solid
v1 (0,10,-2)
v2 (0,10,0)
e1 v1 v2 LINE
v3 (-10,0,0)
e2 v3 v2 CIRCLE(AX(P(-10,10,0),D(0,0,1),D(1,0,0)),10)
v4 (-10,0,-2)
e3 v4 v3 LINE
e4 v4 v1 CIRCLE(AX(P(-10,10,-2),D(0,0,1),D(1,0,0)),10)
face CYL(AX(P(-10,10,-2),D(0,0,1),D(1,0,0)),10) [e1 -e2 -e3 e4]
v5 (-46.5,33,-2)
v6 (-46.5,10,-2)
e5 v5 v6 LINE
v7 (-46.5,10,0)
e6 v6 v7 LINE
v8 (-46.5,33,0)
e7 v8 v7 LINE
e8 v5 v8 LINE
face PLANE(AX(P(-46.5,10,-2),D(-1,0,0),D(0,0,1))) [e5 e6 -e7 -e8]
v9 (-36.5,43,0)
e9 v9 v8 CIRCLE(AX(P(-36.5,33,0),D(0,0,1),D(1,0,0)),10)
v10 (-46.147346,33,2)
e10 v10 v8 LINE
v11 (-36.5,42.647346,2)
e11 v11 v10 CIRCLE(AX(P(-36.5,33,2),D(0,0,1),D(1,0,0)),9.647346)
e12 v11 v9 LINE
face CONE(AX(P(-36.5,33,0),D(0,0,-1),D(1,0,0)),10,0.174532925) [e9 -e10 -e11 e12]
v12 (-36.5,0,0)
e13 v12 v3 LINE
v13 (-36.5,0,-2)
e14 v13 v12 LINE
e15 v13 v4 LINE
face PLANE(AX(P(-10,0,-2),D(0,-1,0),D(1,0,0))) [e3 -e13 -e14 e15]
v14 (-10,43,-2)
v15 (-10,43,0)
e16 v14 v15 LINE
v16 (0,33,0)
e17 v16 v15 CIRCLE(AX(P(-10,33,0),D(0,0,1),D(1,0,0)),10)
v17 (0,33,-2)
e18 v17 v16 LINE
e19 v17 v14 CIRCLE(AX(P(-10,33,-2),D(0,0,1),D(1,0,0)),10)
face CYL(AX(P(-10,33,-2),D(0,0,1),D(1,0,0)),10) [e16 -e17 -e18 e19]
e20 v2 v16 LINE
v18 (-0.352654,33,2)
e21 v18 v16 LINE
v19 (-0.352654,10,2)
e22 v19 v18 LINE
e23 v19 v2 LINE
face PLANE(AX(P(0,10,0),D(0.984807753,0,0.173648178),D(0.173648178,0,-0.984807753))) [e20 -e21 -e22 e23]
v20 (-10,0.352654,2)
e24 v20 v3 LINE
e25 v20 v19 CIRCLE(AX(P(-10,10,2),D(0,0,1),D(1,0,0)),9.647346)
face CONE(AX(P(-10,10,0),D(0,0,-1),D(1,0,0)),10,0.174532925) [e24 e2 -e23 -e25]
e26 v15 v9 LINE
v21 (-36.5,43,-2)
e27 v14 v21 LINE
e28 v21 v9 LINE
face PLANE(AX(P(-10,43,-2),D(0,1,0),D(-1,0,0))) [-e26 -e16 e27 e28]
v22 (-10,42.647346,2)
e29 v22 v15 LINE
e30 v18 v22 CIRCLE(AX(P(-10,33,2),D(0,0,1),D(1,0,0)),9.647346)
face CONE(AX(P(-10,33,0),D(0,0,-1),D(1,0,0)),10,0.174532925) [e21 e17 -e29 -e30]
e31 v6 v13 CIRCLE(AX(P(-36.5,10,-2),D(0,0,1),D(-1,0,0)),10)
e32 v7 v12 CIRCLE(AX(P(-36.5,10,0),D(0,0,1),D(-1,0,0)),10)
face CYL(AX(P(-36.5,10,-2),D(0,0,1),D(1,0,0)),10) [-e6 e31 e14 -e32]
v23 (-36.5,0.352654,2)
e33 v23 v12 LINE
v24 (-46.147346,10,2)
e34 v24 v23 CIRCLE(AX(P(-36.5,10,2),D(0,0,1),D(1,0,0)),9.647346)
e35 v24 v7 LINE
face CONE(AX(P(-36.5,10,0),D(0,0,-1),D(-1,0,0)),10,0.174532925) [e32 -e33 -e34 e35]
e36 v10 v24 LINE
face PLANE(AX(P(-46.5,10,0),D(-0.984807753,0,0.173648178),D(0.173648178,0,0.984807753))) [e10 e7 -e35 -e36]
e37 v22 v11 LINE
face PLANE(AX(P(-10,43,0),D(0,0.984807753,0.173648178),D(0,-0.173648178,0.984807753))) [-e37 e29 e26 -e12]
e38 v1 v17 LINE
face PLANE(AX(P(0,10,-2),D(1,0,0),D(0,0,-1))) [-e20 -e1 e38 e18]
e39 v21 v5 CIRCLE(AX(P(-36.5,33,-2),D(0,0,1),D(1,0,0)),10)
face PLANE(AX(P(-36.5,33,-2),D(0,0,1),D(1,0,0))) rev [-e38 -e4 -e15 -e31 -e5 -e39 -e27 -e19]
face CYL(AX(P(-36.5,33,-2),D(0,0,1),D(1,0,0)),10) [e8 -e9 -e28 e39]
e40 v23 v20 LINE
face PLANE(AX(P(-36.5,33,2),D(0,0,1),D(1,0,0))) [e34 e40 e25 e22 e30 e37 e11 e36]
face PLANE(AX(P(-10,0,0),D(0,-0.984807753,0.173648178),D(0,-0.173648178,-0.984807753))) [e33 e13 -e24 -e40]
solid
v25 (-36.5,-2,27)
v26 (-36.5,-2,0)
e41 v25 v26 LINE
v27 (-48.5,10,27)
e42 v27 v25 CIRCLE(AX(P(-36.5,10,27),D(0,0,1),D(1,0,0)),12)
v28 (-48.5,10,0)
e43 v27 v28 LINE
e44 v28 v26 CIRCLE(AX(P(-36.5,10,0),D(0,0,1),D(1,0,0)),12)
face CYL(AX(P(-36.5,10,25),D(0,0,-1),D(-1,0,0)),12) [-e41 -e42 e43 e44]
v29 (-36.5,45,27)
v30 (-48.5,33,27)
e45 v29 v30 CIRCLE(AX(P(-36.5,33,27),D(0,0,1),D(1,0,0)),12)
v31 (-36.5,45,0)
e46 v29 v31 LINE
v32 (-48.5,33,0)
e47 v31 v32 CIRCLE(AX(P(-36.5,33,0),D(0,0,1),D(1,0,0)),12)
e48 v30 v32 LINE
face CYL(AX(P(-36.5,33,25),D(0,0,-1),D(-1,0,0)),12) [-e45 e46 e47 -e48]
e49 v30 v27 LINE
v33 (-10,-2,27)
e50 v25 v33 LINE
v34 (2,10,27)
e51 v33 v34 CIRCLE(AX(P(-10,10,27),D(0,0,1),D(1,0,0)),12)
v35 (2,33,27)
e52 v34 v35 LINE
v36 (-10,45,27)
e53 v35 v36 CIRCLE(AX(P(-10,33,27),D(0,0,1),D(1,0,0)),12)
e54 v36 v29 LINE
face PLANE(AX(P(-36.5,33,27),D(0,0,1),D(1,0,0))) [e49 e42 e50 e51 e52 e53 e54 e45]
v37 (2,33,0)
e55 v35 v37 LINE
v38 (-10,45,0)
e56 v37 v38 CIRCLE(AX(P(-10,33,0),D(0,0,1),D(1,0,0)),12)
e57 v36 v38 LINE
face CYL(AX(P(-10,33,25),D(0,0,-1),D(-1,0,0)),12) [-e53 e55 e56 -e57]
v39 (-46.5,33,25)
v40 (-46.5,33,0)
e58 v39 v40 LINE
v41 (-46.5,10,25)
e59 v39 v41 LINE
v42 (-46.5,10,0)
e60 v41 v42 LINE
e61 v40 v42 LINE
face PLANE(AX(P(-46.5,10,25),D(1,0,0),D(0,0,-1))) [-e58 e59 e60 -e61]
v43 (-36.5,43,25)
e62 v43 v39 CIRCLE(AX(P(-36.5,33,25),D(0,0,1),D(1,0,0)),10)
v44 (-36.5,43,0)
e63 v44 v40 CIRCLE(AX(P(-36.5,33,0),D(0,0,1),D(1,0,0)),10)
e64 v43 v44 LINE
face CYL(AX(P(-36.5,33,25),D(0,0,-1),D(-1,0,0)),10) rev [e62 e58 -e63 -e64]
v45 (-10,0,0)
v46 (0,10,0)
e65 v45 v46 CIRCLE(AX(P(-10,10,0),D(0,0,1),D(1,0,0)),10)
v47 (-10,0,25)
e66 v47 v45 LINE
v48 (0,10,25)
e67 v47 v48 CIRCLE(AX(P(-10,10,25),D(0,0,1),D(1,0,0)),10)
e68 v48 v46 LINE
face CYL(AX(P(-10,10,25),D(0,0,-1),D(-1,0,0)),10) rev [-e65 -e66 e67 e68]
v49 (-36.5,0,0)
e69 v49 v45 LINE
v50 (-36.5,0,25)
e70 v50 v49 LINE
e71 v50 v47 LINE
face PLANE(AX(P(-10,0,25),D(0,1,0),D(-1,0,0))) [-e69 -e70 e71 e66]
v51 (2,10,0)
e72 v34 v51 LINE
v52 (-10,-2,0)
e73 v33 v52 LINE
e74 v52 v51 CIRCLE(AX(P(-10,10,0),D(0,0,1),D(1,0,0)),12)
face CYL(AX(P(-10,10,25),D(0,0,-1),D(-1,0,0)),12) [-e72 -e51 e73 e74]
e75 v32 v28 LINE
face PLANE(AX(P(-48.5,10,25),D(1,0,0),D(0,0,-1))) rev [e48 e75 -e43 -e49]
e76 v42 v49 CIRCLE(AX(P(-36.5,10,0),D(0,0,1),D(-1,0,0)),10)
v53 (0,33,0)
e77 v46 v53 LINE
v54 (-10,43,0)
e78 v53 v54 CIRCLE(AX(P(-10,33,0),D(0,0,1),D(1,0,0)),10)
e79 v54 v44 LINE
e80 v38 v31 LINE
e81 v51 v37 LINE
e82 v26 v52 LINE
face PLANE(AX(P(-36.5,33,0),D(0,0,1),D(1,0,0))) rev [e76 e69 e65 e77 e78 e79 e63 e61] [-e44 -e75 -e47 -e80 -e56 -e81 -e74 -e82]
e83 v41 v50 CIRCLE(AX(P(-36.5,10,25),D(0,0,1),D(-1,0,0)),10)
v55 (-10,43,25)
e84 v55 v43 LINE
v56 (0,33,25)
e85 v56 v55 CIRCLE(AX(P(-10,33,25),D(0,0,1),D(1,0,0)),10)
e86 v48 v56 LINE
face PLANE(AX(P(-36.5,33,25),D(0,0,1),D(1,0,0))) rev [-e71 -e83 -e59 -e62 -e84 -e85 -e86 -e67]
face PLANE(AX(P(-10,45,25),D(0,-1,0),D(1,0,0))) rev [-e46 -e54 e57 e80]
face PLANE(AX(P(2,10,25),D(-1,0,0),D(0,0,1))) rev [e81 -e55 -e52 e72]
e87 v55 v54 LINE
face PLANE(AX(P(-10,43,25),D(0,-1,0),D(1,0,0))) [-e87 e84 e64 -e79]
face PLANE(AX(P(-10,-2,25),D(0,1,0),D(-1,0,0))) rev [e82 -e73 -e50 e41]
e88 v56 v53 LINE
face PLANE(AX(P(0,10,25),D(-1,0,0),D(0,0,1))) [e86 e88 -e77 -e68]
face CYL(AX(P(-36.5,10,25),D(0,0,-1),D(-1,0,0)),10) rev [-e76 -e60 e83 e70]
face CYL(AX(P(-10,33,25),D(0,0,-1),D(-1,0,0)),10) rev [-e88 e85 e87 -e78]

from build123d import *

# Parameters (mm, degrees)
RESSALTO_EXTRUS_O1_DEPTH           = 25
CASCA1_START                       = -36.5
CASCA1_OUTLINE_W                   = 43
CASCA1_OUTLINE_H                   = 25
CASCA1_DEPTH                       = 26.5
CASCA1_2_DEPTH                     = 26.5
CASCA1_3_DEPTH                     = 25
CASCA1_4_DEPTH                     = 27
CASCA1_START_2                     = 25
CASCA1_5_DEPTH                     = 2
RESSALTO_EXTRUS_O2_DEPTH           = 2
RESSALTO_EXTRUS_O2_OTHER_WAY_DEPTH = 2
RESSALTO_EXTRUS_O2_OTHER_WAY_TAPER = 10


with BuildPart() as part:
    # Esboço1 → Ressalto-extrusão1 (new body)
    with BuildSketch(Plane.XY):
        with BuildLine():
            Line((-10, 0), (-36.5, 0))
            ThreePointArc((-36.5, 0), (-43.571067812, 2.928932188), (-46.5, 10))
            Line((-46.5, 10), (-46.5, 33))
            ThreePointArc((-46.5, 33), (-43.571067812, 40.071067812), (-36.5, 43))
            Line((-36.5, 43), (-10, 43))
            ThreePointArc((-10, 43), (-2.928932188, 40.071067812), (0, 33))
            Line((0, 33), (0, 10))
            ThreePointArc((0, 10), (-2.928932188, 2.928932188), (-10, 0))
        make_face()
    extrude(amount=RESSALTO_EXTRUS_O1_DEPTH)

    # Casca1: read off the stored shape, not the designer's step
    # Casca1 outline → Casca1 (cut)
    with BuildSketch(Plane.YZ.offset(CASCA1_START)):
        with Locations((21.5, 12.5)):
            Rectangle(CASCA1_OUTLINE_W, CASCA1_OUTLINE_H)
    extrude(amount=CASCA1_DEPTH, mode=Mode.SUBTRACT)

    # Casca1 2 outline → Casca1 2 (add)
    with BuildSketch(Plane.YZ.offset(CASCA1_START)):
        Polygon((-2, 27), (-2, 0), (0, 0), (0, 25), (43, 25), (43, 0), (45, 0), (45, 27), align=None)
    extrude(amount=CASCA1_2_DEPTH)

    # Casca1 3 outline → Casca1 3 (cut)
    with BuildSketch(Plane.XY):
        with BuildLine():
            Line((-36.5, 0), (-36.5, 43))
            ThreePointArc((-36.5, 43), (-43.571067812, 40.071067812), (-46.5, 33))
            Line((-46.5, 33), (-46.5, 10))
            ThreePointArc((-46.5, 10), (-43.571067812, 2.928932188), (-36.5, 0))
        make_face()
        with BuildLine():
            Line((-10, 43), (-10, 0))
            ThreePointArc((-10, 0), (-2.928932188, 2.928932188), (0, 10))
            Line((0, 10), (0, 33))
            ThreePointArc((0, 33), (-2.928932188, 40.071067812), (-10, 43))
        make_face()
    extrude(amount=CASCA1_3_DEPTH, mode=Mode.SUBTRACT)

    # Casca1 4 outline → Casca1 4 (add)
    with BuildSketch(Plane.XY):
        with BuildLine():
            ThreePointArc((-36.5, 45), (-44.985281374, 41.485281374), (-48.5, 33))
            Line((-48.5, 33), (-48.5, 10))
            ThreePointArc((-48.5, 10), (-44.985281374, 1.514718626), (-36.5, -2))
            Line((-36.5, -2), (-36.5, 0))
            ThreePointArc((-36.5, 0), (-43.571067812, 2.928932188), (-46.5, 10))
            Line((-46.5, 10), (-46.5, 33))
            ThreePointArc((-46.5, 33), (-43.571067812, 40.071067812), (-36.5, 43))
            Line((-36.5, 43), (-36.5, 45))
        make_face()
        with BuildLine():
            ThreePointArc((-10, -2), (-1.514718626, 1.514718626), (2, 10))
            Line((2, 10), (2, 33))
            ThreePointArc((2, 33), (-1.514718626, 41.485281374), (-10, 45))
            Line((-10, 45), (-10, 43))
            ThreePointArc((-10, 43), (-2.928932188, 40.071067812), (0, 33))
            Line((0, 33), (0, 10))
            ThreePointArc((0, 10), (-2.928932188, 2.928932188), (-10, 0))
            Line((-10, 0), (-10, -2))
        make_face()
    extrude(amount=CASCA1_4_DEPTH)

    # Casca1 5 outline → Casca1 5 (add)
    with BuildSketch(Plane.XY.offset(CASCA1_START_2)):
        with BuildLine():
            Line((-36.5, 0), (-36.5, 43))
            ThreePointArc((-36.5, 43), (-43.571067812, 40.071067812), (-46.5, 33))
            Line((-46.5, 33), (-46.5, 10))
            ThreePointArc((-46.5, 10), (-43.571067812, 2.928932188), (-36.5, 0))
        make_face()
        with BuildLine():
            Line((-10, 43), (-10, 0))
            ThreePointArc((-10, 0), (-2.928932188, 2.928932188), (0, 10))
            Line((0, 10), (0, 33))
            ThreePointArc((0, 33), (-2.928932188, 40.071067812), (-10, 43))
        make_face()
    extrude(amount=CASCA1_5_DEPTH)



with BuildPart() as body_2:
    # Esboço6 → Ressalto-extrusão2 (new body)
    with BuildSketch(Plane.XY):
        with BuildLine():
            ThreePointArc((-10, 0), (-2.928932188, 2.928932188), (0, 10))
            Line((0, 10), (0, 33))
            ThreePointArc((0, 33), (-2.928932188, 40.071067812), (-10, 43))
            Line((-10, 43), (-36.5, 43))
            ThreePointArc((-36.5, 43), (-43.571067812, 40.071067812), (-46.5, 33))
            Line((-46.5, 33), (-46.5, 10))
            ThreePointArc((-46.5, 10), (-43.571067812, 2.928932188), (-36.5, 0))
            Line((-36.5, 0), (-10, 0))
        make_face()
    extrude(amount=-RESSALTO_EXTRUS_O2_DEPTH)


with BuildPart() as part_1:
    add(part.part)

    add(body_2.part)  # Ressalto-extrusão2 other way merges body 2
    # Esboço6 → Ressalto-extrusão2 other way (add)
    with BuildSketch(Plane.XY):
        with BuildLine():
            ThreePointArc((-10, 0), (-2.928932188, 2.928932188), (0, 10))
            Line((0, 10), (0, 33))
            ThreePointArc((0, 33), (-2.928932188, 40.071067812), (-10, 43))
            Line((-10, 43), (-36.5, 43))
            ThreePointArc((-36.5, 43), (-43.571067812, 40.071067812), (-46.5, 33))
            Line((-46.5, 33), (-46.5, 10))
            ThreePointArc((-46.5, 10), (-43.571067812, 2.928932188), (-36.5, 0))
            Line((-36.5, 0), (-10, 0))
        make_face()
    extrude(amount=RESSALTO_EXTRUS_O2_OTHER_WAY_DEPTH, taper=RESSALTO_EXTRUS_O2_OTHER_WAY_TAPER)


solid = part_1.part
